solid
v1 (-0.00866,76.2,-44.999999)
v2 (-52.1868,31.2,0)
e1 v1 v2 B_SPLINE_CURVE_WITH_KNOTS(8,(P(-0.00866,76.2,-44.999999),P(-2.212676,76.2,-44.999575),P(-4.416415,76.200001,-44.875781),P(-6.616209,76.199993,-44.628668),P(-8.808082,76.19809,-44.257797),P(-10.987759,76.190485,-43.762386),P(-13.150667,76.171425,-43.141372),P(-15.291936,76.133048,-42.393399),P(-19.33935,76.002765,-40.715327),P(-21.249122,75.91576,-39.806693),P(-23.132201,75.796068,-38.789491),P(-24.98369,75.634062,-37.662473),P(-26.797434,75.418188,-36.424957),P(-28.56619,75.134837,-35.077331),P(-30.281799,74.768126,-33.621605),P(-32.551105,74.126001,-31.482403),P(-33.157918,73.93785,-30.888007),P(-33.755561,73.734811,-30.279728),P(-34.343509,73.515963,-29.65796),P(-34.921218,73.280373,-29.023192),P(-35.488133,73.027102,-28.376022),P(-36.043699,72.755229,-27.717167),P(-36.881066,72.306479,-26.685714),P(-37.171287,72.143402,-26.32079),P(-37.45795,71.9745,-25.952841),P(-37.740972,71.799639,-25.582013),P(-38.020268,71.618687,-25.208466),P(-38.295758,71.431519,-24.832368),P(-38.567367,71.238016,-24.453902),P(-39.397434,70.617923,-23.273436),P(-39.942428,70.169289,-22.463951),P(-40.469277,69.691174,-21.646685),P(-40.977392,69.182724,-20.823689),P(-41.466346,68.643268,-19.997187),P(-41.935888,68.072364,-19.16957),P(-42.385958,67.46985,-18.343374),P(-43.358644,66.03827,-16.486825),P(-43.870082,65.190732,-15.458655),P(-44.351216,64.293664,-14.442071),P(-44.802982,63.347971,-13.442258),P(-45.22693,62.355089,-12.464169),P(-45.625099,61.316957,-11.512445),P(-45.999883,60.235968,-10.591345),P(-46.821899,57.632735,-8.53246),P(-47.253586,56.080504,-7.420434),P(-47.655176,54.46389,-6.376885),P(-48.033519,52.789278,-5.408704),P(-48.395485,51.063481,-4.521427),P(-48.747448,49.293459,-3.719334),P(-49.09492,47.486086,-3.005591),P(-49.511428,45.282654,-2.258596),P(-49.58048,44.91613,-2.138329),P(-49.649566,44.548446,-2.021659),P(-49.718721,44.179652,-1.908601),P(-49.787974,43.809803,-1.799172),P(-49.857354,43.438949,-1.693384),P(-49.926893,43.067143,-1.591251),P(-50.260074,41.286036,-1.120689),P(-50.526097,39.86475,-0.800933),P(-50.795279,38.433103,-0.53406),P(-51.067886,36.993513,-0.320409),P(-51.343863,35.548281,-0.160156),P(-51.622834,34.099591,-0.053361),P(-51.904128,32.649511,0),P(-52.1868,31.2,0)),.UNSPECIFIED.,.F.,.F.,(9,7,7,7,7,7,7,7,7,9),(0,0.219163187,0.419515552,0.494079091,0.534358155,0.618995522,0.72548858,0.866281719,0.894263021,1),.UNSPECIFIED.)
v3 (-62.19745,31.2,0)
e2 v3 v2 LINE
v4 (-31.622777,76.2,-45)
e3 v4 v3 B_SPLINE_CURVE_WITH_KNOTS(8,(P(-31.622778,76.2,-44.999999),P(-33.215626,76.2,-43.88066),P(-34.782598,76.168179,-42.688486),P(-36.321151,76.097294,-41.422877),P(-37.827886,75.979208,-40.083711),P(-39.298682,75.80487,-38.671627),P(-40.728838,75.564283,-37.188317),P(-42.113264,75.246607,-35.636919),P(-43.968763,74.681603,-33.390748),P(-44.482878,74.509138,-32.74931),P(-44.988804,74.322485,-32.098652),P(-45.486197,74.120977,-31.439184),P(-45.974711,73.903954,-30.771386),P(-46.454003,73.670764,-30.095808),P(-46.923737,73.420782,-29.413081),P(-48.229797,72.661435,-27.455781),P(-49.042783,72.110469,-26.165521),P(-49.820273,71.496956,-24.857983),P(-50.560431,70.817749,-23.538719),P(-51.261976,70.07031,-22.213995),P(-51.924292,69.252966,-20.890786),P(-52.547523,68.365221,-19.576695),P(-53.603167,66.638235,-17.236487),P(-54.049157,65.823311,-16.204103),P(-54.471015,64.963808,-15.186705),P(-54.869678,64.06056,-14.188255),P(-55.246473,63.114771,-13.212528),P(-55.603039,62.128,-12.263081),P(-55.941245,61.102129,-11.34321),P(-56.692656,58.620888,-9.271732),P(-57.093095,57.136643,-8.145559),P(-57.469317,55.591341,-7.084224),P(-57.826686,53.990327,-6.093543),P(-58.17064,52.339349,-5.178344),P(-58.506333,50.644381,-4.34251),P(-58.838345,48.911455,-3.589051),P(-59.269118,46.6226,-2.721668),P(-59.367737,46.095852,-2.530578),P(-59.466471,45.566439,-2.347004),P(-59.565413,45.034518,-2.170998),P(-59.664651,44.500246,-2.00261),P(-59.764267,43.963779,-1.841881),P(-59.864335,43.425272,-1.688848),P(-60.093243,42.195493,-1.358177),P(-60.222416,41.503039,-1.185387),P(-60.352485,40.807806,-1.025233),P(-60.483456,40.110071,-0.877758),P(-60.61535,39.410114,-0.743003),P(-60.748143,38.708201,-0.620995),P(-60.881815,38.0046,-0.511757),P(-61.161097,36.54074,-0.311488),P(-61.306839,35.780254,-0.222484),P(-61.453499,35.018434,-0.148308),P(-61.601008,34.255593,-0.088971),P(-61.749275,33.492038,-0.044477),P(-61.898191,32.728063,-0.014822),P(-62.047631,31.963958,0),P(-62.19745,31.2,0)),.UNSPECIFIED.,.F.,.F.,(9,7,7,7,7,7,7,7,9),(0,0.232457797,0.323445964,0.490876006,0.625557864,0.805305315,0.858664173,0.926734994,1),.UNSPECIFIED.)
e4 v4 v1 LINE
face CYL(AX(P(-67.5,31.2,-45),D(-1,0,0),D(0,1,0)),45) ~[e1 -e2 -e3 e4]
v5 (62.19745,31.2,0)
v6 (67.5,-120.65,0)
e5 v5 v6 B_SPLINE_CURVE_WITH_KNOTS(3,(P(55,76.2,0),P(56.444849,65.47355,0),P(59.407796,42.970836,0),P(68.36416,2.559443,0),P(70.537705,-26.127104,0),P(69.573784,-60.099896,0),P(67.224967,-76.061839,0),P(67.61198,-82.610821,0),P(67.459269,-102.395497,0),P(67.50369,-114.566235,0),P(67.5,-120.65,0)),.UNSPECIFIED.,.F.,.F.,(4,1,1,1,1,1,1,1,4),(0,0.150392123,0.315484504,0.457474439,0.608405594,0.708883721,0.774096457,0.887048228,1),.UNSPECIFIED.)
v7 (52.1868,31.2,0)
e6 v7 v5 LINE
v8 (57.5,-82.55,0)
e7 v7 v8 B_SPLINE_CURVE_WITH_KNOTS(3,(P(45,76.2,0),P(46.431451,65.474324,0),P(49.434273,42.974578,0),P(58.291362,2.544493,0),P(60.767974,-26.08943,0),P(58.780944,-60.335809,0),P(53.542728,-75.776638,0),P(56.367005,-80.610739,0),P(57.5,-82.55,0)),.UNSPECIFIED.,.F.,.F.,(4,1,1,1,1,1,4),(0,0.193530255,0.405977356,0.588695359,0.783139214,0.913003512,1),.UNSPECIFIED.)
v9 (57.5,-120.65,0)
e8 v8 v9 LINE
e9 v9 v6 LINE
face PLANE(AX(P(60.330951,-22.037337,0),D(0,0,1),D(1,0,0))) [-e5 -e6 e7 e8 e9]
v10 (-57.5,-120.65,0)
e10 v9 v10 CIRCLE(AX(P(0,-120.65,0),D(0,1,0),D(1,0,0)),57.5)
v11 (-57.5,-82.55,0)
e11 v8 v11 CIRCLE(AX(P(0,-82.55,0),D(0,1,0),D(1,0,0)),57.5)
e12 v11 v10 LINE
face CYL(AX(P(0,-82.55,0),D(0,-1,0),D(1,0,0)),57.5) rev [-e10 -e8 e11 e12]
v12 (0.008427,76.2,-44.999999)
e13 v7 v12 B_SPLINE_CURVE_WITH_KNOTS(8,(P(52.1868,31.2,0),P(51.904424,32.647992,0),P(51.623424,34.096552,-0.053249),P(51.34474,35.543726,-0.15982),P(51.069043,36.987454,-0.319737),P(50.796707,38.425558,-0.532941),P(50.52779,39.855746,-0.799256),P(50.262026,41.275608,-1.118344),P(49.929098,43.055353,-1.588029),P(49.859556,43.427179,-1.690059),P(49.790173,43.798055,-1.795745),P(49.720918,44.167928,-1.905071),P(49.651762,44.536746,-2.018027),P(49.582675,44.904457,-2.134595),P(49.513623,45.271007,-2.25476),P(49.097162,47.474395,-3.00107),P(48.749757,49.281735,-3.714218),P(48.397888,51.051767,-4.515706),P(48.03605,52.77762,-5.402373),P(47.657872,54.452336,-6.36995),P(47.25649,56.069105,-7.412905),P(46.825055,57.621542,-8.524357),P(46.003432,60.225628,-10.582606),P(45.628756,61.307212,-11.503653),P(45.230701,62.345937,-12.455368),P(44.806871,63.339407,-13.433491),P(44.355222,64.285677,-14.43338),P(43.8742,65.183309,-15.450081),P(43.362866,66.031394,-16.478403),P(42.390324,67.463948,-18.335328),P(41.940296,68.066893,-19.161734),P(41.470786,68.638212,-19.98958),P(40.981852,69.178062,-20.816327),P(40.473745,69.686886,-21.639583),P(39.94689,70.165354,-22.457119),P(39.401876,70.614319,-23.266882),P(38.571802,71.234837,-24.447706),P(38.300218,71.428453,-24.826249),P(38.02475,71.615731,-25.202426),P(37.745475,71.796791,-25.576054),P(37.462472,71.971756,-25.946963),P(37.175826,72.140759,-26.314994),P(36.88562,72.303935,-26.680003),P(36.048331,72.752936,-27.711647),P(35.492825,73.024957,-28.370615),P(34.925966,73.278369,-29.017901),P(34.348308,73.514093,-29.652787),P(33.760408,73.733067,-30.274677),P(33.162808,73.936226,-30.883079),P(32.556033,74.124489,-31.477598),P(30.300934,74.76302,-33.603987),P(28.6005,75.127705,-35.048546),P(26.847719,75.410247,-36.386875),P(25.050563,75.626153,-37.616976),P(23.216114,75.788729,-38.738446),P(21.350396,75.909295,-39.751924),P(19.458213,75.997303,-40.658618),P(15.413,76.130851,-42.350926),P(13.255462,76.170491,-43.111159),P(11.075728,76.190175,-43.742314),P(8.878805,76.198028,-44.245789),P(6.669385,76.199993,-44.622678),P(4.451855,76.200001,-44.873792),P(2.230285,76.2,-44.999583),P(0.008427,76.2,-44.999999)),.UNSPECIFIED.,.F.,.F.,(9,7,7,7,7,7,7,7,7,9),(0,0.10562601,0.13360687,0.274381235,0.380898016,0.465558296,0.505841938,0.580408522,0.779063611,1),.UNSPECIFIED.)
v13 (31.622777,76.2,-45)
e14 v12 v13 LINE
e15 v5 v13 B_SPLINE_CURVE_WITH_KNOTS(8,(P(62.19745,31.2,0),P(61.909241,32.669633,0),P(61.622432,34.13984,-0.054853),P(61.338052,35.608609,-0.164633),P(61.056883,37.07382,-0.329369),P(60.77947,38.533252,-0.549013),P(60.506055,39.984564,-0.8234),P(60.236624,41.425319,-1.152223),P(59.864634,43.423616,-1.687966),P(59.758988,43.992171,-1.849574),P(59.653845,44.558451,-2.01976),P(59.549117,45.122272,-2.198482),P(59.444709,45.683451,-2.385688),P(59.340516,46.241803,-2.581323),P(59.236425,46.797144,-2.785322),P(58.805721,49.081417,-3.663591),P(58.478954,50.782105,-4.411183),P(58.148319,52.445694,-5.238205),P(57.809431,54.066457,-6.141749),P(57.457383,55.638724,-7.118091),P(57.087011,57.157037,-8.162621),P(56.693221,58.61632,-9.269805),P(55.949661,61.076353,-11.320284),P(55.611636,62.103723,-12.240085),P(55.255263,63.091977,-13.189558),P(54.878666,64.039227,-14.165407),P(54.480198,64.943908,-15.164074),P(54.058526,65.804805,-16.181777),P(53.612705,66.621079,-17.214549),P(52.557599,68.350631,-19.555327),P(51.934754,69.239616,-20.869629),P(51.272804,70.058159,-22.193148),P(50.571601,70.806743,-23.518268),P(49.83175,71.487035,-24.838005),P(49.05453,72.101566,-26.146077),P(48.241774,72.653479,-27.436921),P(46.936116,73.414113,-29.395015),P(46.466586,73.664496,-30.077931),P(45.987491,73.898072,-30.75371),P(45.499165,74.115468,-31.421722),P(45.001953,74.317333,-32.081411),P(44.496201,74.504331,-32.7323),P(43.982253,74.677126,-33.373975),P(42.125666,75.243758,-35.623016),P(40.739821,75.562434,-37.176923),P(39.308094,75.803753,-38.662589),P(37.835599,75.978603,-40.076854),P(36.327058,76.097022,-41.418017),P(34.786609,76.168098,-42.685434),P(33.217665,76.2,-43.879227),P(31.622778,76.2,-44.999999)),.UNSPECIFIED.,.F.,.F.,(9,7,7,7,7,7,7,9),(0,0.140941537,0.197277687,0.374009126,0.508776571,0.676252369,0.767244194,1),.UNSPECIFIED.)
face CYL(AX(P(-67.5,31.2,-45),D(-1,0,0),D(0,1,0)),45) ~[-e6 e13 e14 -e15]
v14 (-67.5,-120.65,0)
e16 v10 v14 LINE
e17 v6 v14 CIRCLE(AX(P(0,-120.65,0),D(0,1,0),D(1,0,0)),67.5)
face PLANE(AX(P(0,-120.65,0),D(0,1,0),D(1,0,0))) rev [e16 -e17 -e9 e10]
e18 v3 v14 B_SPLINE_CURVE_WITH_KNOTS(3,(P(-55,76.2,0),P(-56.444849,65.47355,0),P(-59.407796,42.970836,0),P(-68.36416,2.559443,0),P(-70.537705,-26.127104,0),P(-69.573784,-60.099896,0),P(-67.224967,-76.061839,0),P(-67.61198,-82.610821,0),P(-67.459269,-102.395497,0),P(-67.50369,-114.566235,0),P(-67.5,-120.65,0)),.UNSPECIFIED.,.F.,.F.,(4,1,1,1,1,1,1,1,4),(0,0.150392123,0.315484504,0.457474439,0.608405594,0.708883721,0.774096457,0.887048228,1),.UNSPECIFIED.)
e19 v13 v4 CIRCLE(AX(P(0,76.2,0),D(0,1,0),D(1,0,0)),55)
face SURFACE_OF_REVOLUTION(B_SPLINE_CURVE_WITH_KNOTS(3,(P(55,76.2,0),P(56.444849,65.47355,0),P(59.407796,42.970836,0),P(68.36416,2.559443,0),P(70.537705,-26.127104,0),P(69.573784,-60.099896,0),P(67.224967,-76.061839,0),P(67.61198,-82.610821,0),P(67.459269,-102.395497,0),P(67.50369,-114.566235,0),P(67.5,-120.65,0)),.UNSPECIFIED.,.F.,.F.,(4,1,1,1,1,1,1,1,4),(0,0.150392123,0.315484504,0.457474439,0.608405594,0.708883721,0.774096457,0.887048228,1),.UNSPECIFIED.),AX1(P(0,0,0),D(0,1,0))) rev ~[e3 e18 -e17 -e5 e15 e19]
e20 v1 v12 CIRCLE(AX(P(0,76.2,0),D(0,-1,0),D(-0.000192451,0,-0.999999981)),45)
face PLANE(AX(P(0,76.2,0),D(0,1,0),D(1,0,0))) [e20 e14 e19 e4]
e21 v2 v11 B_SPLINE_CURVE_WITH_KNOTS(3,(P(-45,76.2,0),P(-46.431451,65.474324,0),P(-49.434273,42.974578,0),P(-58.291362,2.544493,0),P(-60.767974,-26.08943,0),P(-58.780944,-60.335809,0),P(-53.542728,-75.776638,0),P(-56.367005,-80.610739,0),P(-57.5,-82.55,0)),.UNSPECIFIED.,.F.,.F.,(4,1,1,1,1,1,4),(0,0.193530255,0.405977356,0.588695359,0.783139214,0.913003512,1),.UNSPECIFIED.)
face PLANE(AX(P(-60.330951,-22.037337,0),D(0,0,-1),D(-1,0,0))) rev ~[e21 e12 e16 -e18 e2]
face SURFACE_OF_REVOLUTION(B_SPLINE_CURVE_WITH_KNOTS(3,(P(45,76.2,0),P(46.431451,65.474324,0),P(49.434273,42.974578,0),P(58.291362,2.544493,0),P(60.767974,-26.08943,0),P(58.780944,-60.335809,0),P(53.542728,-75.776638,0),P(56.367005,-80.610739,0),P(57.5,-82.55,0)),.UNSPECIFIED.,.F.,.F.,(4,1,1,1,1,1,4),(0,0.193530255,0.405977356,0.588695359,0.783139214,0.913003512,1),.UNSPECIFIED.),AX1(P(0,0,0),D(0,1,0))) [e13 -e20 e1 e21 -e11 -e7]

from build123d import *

# Parameters (mm, degrees)
F1_ANGLE    = 180
F2_T1_DEPTH = 235
F2_T3_DEPTH = 235


# Not quite as in the source:
# - a fillet or chamfer that OpenCascade refuses, or shapes differently, is made with other operations: its cross-section is extruded or revolved along the edge and cut away or added


with BuildPart() as f1:
    # F0 (on Top) → F1 (revolve)
    with BuildSketch(Plane.XY):
        with BuildLine():
            Line((55, 76.2), (45, 76.2))
            add(Edge.make_bspline(
                [(45, 76.2), (46.4314513107, 65.4743240031), (49.4342728448, 42.9745780396), (58.2913617327, 2.5444927944), (60.7679740967, -26.0894301808), (58.7809439185, -60.3358085831), (53.5427275811, -75.7766382868), (56.3670048957, -80.6107385976), (57.5, -82.55)],
                knots=[0, 0, 0, 0, 0.1935302552, 0.4059773556, 0.5886953586, 0.7831392141, 0.9130035116, 1, 1, 1, 1], degree=3))
            Line((57.5, -82.55), (57.5, -120.65))
            Line((57.5, -120.65), (67.5, -120.65))
            add(Edge.make_bspline(
                [(55, 76.2), (56.4448487865, 65.4735496208), (59.4077958305, 42.9708360316), (68.3641601176, 2.5594432328), (70.5377050341, -26.12710406), (69.5737841588, -60.0998956005), (67.2249671963, -76.0618392071), (67.611979836, -82.6108206706), (67.4592693335, -102.3954969726), (67.5036900604, -114.5662351269), (67.5, -120.65)],
                knots=[0, 0, 0, 0, 0.1503921233, 0.3154845037, 0.4574744391, 0.6084055945, 0.7088837212, 0.7740964569, 0.8870482285, 1, 1, 1, 1], degree=3))
        make_face()
    revolve(axis=Axis((0, 0, 0), (0, 1, 0)), revolution_arc=F1_ANGLE)

    # F2: fillet of radius 45 on 2 edges, made by hand

    # F2_s2 → F2_t1 (cut)
    with BuildSketch(Plane.YZ.offset(-67.5)):
        with BuildLine():
            ThreePointArc((76.2, -45), (63.0198051534, -13.1801948466), (31.2, 0))
            Line((31.2, 0), (76.2, 0))
            Line((76.2, 0), (76.2, -45))
        make_face()
    extrude(amount=F2_T1_DEPTH, mode=Mode.SUBTRACT)

    # F2_s4 → F2_t3 (cut)
    with BuildSketch(Plane.YZ.offset(-167.5)):
        with BuildLine():
            ThreePointArc((76.2, -45), (63.0198051534, -13.1801948466), (31.2, 0))
            Line((31.2, 0), (76.2, 0))
            Line((76.2, 0), (76.2, -45))
        make_face()
    extrude(amount=F2_T3_DEPTH, mode=Mode.SUBTRACT)


solid = f1.part
